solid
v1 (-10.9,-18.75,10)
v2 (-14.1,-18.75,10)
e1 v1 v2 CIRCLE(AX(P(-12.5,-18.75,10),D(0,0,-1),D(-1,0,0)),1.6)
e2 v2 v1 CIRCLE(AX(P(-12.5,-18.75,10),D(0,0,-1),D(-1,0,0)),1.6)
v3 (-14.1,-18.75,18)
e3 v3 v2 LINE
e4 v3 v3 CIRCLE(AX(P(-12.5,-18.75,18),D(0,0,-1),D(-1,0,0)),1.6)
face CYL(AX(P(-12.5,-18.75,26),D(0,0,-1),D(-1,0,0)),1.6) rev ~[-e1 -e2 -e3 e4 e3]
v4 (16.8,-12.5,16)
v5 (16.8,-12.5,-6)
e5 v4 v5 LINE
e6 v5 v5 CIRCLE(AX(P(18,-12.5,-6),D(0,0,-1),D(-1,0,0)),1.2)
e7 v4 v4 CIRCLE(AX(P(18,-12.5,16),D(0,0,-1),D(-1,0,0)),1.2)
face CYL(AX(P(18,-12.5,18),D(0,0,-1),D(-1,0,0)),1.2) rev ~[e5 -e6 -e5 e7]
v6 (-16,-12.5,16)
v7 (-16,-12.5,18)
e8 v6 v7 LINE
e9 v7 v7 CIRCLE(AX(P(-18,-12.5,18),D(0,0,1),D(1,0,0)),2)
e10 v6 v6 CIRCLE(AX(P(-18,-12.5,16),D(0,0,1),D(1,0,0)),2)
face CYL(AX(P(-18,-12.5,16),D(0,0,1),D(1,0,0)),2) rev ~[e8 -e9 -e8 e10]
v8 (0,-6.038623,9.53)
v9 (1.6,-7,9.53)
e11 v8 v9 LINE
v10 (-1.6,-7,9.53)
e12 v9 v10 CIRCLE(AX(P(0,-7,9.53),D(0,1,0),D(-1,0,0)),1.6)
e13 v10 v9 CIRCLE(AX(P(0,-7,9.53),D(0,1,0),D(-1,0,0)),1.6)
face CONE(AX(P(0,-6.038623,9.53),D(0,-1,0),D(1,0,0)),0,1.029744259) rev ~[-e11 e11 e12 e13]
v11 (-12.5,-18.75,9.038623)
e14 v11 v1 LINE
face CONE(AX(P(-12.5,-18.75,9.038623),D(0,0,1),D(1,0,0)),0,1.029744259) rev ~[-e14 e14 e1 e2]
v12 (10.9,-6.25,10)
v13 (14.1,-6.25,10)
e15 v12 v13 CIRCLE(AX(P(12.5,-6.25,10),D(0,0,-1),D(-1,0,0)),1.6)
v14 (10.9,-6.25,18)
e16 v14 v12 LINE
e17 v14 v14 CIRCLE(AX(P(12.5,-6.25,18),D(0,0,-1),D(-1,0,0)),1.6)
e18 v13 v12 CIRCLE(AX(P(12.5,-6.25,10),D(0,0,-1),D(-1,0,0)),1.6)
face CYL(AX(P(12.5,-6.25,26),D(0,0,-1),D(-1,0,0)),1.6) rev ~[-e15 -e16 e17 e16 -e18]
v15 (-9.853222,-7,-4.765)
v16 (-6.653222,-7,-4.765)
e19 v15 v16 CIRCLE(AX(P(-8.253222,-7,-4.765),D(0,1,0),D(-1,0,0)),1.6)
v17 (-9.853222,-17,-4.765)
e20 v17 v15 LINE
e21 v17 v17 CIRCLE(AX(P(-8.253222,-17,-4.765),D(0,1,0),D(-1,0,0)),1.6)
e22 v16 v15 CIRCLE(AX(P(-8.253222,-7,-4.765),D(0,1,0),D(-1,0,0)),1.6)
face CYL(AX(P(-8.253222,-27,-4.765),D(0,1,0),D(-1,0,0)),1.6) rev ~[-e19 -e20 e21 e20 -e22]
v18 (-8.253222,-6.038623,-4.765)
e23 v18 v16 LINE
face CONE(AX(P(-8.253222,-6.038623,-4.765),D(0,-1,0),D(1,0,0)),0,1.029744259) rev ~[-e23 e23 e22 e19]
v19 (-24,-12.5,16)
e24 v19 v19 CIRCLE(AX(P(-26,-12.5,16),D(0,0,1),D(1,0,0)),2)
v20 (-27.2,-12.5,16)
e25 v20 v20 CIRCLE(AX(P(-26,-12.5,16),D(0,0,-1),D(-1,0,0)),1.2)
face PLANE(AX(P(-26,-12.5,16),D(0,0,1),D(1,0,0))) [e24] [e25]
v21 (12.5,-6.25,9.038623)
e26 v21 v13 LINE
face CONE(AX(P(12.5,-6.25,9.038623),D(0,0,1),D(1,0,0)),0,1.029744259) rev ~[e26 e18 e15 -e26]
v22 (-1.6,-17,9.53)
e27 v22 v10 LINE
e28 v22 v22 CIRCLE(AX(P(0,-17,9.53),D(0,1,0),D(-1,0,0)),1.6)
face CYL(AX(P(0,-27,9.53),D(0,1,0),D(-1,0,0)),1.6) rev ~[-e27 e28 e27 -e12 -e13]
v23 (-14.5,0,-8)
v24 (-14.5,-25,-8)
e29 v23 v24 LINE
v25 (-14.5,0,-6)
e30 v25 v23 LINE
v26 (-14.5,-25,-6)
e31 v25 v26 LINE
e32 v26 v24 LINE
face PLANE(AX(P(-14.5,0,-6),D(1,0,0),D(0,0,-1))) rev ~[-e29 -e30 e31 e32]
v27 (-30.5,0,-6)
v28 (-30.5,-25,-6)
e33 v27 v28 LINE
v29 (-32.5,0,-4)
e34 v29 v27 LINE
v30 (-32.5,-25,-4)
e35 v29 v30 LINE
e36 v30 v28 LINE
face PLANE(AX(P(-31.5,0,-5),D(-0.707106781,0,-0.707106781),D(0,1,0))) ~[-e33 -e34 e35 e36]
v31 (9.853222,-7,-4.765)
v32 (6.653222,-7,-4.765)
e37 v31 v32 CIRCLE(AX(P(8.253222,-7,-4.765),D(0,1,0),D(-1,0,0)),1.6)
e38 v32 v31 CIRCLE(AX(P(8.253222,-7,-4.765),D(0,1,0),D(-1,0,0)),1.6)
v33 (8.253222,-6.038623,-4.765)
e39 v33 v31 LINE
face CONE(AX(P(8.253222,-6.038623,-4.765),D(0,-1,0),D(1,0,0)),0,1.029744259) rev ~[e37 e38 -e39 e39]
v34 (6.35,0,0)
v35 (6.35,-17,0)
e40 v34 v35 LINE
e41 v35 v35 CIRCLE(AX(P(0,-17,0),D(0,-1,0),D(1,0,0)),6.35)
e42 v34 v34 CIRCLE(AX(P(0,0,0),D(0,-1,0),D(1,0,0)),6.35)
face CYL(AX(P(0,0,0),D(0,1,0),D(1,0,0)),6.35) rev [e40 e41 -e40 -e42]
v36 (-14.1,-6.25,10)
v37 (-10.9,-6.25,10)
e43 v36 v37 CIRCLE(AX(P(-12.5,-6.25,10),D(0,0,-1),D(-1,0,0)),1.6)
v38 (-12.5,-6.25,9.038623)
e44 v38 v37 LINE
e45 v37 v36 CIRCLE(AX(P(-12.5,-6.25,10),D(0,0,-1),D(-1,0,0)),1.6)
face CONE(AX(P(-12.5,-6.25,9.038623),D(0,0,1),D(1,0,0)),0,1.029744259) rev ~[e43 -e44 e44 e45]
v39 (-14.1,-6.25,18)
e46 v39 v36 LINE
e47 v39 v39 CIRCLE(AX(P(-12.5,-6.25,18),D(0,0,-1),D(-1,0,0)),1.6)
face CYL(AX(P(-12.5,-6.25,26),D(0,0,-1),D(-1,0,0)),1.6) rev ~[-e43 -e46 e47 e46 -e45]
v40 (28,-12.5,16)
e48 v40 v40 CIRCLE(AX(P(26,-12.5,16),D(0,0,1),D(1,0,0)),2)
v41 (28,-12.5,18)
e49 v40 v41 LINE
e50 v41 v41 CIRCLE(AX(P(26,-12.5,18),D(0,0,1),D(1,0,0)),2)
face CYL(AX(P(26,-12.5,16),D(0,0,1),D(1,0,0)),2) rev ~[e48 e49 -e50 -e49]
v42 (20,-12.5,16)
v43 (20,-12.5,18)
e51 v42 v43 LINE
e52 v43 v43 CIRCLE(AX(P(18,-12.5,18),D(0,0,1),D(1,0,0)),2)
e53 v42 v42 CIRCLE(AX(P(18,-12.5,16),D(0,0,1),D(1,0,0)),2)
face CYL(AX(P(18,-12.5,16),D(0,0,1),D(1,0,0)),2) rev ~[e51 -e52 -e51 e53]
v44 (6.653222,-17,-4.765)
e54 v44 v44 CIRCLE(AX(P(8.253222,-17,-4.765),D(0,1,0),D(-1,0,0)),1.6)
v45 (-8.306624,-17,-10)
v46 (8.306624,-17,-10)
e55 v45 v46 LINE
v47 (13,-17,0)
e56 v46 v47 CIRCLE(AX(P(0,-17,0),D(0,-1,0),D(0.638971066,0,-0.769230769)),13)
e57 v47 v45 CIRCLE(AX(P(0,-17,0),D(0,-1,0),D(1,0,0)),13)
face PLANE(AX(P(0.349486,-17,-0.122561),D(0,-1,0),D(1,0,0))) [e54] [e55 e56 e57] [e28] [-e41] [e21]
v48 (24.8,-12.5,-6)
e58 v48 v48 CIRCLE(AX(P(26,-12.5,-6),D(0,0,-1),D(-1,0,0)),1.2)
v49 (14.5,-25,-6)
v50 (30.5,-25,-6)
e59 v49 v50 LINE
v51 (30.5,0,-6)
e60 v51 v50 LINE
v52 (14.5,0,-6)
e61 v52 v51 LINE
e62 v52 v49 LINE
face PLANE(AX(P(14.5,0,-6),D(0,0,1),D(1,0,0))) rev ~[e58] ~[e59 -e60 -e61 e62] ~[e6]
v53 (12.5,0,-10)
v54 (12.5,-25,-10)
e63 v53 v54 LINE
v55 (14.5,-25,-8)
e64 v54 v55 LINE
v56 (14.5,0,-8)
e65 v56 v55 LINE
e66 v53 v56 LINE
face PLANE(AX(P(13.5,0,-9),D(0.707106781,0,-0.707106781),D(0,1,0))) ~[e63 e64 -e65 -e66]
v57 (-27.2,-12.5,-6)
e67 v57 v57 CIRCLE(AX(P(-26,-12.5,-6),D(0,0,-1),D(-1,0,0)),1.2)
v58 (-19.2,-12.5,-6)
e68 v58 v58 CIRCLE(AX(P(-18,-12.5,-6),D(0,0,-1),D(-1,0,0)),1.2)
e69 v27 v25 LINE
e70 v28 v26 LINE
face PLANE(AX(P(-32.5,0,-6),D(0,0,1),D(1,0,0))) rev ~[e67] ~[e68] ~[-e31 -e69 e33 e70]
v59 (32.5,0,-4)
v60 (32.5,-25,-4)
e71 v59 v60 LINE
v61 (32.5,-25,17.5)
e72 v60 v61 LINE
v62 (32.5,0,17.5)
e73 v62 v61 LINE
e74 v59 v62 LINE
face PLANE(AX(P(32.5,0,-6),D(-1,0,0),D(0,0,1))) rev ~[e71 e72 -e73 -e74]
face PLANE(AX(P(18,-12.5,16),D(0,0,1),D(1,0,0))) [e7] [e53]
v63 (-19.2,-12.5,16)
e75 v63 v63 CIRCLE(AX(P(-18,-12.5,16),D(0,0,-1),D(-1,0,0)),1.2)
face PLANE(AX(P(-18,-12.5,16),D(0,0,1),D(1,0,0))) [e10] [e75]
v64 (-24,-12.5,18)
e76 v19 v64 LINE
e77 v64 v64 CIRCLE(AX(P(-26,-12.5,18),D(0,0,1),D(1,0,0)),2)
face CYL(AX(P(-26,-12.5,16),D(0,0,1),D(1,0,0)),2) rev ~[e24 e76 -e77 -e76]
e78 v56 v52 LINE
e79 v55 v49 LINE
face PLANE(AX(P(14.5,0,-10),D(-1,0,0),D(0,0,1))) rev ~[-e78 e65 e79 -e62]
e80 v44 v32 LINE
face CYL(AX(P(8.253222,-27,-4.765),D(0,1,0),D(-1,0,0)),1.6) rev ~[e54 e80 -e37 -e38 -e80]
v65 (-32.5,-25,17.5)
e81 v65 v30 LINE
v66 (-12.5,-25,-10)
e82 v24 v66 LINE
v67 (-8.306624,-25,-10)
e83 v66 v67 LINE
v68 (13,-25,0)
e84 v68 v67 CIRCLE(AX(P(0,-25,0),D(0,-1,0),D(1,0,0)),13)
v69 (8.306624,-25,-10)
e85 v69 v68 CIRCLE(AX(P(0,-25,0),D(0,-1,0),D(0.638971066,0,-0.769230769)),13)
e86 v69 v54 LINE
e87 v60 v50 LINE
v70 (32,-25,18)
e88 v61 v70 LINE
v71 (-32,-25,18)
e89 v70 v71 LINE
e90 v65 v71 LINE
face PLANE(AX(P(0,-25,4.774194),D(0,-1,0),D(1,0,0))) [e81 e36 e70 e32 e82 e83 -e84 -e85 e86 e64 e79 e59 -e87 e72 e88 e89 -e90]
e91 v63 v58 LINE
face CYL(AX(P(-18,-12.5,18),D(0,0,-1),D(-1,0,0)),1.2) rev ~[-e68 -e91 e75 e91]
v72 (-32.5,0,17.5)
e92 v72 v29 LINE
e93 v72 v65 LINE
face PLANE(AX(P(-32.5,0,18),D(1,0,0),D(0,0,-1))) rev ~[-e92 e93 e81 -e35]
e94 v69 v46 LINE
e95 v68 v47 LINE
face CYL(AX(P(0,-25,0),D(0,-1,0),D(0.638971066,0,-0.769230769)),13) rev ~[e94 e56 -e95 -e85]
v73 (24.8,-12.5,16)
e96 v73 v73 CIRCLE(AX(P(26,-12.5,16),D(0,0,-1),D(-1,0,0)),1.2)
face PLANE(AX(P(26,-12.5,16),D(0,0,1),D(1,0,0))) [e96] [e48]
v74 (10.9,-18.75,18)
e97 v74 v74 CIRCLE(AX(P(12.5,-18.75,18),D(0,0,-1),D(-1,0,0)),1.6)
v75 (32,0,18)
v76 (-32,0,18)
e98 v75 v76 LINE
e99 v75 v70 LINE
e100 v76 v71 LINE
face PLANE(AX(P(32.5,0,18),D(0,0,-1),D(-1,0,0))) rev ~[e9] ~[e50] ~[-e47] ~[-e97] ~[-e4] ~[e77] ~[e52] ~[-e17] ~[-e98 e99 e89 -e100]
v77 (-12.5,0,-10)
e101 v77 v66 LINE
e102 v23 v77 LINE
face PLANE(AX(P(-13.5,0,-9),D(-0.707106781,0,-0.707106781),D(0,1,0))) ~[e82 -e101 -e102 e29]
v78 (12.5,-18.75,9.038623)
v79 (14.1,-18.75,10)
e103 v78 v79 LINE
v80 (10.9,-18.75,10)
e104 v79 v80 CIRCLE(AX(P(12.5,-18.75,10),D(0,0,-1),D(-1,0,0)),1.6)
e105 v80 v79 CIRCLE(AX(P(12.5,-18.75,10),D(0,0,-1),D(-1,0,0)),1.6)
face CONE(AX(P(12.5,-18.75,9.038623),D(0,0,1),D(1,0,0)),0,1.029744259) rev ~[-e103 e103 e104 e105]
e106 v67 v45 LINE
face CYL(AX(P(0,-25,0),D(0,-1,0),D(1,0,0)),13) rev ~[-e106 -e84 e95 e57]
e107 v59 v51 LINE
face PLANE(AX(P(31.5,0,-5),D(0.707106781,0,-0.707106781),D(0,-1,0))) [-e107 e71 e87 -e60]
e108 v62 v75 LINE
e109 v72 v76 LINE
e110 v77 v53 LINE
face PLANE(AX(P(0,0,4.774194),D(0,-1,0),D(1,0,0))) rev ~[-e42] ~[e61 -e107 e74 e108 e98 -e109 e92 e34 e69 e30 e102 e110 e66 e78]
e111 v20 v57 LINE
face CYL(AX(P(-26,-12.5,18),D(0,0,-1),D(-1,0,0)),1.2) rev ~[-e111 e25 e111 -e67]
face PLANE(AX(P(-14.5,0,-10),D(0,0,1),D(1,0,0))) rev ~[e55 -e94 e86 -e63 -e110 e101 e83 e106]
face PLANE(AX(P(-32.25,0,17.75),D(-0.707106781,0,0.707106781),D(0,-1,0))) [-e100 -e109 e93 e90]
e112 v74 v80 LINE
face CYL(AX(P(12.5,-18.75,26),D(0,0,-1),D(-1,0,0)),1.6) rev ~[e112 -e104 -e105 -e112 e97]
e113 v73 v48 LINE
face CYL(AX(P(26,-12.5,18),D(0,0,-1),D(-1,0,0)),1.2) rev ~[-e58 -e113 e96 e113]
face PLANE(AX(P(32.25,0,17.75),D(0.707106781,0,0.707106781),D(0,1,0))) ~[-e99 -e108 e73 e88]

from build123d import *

# Parameters (mm, degrees)
F0_R           = 6.35
F1_DEPTH       = 25
F2_SIZE        = 0.5
F3_R           = 6.35
F4_DEPTH       = 8
F5_SIZE        = 2
F7_D           = 3.2
F7_DEPTH       = 8
F7_TIP         = 0.9613769904
F9_D           = 2.4
F9_CBORE_D     = 4
F9_CBORE_DEPTH = 2
F11_D          = 3.2
F11_DEPTH      = 10
F11_TIP        = 0.9613769904


with BuildPart() as f1:
    # F0 (on Front) → F1 (new body)
    with BuildSketch(Plane.XZ):
        Polygon((-14.5, -10), (14.5, -10), (14.5, -6), (32.5, -6), (32.5, 18), (-32.5, 18), (-32.5, -6), (-14.5, -6), align=None)
        Circle(F0_R, mode=Mode.SUBTRACT)
    extrude(amount=F1_DEPTH)

    # F2
    f2_edges = [f1.edges().sort_by_distance(p)[0] for p in [
        (-32.5, -12.5, 18),
        (32.5, -12.5, 18),
    ]]
    chamfer(f2_edges, length=F2_SIZE)

    # F3 (on face) → F4 (cut)
    with BuildSketch(Plane.XZ.offset(25)):
        with BuildLine():
            ThreePointArc((8.3066238629, -10), (11.7683072321, -5.5233092337), (13, 0))
            ThreePointArc((13, 0), (-5.5233092337, 11.7683072321), (-8.3066238629, -10))
            Line((-8.3066238629, -10), (8.3066238629, -10))
        make_face()
        Circle(F3_R, mode=Mode.SUBTRACT)
    extrude(amount=-F4_DEPTH, mode=Mode.SUBTRACT)

    # F5
    f5_edges = [f1.edges().sort_by_distance(p)[0] for p in [
        (32.5, -12.5, -6),
        (14.5, -12.5, -10),
        (-14.5, -12.5, -10),
        (-32.5, -12.5, -6),
    ]]
    chamfer(f5_edges, length=F5_SIZE)

    # F7
    with Locations(Plane.XY.offset(18)):
        with Locations((12.5, -6.25), (12.5, -18.75), (-12.5, -6.25), (-12.5, -18.75)):
            Hole(F7_D / 2, depth=F7_DEPTH)
            with Locations((0, 0, -(F7_DEPTH + F7_TIP / 2))):  # 118° drill point
                Cone(0, F7_D / 2, F7_TIP, mode=Mode.SUBTRACT)

    # F9 (through all)
    with Locations(Plane.XY.offset(18)):
        with Locations((-26, -12.5), (-18, -12.5), (18, -12.5), (26, -12.5)):
            CounterBoreHole(F9_D / 2, F9_CBORE_D / 2, F9_CBORE_DEPTH)

    # F11
    with Locations(Plane.XZ.offset(17)):
        with Locations((0, 9.53), (8.2532220981, -4.765), (-8.2532220981, -4.765)):
            Hole(F11_D / 2, depth=F11_DEPTH)
            with Locations((0, 0, -(F11_DEPTH + F11_TIP / 2))):  # 118° drill point
                Cone(0, F11_D / 2, F11_TIP, mode=Mode.SUBTRACT)


solid = f1.part
